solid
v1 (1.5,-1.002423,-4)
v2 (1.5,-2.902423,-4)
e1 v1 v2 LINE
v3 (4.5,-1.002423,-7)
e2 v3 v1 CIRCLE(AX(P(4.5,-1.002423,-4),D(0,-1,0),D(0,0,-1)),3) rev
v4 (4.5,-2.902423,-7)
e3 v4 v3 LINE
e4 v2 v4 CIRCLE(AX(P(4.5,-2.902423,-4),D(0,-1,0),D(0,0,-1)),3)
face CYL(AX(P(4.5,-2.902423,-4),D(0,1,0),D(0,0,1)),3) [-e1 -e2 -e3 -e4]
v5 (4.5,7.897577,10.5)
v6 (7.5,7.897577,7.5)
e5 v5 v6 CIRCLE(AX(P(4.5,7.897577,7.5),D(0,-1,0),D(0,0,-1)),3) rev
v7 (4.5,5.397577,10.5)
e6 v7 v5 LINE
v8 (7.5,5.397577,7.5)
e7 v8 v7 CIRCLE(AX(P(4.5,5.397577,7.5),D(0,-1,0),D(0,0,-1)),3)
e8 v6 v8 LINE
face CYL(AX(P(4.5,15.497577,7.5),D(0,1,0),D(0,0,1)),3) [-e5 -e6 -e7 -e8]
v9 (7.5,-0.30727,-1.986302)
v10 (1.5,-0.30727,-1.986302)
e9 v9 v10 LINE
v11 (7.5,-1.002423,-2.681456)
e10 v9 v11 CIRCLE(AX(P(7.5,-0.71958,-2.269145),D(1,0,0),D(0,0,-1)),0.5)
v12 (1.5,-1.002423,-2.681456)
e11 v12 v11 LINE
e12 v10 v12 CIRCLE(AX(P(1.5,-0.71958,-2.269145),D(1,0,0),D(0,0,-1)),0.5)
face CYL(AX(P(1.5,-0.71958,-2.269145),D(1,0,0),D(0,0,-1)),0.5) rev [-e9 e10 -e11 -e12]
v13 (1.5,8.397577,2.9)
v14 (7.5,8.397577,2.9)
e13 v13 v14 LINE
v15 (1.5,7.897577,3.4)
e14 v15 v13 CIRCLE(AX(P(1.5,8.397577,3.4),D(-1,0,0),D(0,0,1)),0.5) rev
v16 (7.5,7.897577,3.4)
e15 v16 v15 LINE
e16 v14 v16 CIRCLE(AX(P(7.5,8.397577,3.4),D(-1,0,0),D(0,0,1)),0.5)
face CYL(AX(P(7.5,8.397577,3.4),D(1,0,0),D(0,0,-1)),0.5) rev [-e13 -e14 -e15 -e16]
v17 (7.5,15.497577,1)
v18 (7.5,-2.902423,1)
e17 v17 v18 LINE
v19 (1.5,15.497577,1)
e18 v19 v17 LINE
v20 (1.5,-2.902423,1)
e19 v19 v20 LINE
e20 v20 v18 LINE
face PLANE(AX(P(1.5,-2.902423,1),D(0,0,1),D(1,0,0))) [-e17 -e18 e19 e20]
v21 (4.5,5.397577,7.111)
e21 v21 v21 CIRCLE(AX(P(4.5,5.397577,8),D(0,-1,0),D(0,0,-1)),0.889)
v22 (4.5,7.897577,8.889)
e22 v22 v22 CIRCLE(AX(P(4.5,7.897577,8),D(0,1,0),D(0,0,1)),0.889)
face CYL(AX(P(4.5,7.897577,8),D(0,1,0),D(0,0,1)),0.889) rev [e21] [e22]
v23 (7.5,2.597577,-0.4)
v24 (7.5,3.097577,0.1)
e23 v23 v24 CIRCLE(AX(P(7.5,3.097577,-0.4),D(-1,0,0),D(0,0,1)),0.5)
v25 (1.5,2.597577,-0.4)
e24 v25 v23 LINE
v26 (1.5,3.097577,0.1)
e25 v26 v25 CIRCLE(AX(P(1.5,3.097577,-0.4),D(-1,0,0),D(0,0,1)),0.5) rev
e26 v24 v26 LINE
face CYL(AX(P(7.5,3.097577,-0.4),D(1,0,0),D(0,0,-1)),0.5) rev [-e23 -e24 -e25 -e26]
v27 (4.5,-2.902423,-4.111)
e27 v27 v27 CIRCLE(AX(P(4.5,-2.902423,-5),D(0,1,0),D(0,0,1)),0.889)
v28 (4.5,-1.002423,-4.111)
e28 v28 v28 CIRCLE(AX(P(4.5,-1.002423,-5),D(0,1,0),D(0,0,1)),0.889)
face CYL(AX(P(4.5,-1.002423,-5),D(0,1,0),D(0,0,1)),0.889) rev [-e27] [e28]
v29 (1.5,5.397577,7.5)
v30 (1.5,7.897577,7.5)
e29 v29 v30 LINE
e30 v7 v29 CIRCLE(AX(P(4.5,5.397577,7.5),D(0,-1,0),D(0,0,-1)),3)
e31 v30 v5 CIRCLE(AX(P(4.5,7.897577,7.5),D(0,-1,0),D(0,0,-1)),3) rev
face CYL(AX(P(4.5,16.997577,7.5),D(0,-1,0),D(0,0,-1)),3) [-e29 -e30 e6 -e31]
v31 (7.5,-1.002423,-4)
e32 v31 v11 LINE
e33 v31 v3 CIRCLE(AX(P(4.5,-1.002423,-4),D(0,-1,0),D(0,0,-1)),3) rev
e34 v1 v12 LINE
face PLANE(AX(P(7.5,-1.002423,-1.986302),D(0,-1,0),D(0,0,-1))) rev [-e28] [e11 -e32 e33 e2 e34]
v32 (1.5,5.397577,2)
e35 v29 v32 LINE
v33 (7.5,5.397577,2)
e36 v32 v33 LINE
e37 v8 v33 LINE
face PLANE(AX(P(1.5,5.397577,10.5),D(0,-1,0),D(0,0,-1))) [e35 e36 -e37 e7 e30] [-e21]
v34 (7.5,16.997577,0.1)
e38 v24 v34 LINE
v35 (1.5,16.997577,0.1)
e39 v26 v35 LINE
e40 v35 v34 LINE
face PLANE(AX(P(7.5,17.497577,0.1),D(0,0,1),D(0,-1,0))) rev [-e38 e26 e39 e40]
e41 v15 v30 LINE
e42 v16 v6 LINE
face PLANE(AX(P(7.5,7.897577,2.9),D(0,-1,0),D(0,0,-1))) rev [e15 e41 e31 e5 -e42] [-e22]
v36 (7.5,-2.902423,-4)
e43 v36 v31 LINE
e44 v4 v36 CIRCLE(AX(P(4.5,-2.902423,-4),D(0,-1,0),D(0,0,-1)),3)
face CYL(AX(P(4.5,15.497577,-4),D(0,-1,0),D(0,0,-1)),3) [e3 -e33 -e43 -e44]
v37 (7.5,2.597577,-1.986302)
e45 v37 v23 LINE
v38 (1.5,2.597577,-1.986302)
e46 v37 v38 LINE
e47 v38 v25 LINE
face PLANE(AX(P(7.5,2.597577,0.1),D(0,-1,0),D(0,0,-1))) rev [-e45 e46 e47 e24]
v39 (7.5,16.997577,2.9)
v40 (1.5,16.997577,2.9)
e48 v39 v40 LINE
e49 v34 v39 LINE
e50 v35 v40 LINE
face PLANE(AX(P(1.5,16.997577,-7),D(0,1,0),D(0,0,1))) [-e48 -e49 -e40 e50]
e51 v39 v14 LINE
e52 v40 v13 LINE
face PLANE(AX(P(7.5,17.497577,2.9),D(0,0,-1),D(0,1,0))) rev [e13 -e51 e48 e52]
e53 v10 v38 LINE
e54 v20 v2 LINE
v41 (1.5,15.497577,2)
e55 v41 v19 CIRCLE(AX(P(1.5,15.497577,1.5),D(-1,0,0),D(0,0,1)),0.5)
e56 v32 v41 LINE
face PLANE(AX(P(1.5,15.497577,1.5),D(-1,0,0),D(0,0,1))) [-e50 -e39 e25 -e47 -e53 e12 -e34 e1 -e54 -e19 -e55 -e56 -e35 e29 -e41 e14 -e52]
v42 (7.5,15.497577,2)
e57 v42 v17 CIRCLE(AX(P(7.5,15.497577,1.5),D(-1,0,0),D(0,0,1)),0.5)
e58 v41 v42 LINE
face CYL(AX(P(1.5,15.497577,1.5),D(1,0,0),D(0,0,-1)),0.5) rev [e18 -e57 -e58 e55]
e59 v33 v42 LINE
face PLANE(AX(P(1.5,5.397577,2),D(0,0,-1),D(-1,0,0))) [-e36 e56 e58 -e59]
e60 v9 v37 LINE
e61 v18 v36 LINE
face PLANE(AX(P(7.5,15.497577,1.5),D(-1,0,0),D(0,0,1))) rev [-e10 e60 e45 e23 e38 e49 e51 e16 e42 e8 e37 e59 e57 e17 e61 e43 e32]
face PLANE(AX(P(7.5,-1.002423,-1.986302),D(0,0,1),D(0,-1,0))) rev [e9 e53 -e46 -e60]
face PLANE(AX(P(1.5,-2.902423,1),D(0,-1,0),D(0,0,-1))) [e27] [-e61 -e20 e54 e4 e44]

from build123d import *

# Parameters (mm, degrees)
BOSS_EXTRUDE1_DEPTH   = 6
SKETCH3_W             = 7.6
SKETCH3_H             = 7.1
SKETCH3_H_2           = 14.9
CUT_EXTRUDE2_DEPTH    = 21.860671783
SKETCH4_W             = 7.6
SKETCH4_H             = 2.5
SKETCH4_W_2           = 5.5
SKETCH4_H_2           = 3.6
CUT_EXTRUDE3_DEPTH    = 21.860671783
FILLET2_R             = 3
F_2_56_TAPPED_HOLE1_D = 1.778
FILLET3_R             = 0.5
F_2_56_TAPPED_HOLE2_D = 1.778
SKETCH19_R            = 0.5
CUT_EXTRUDE6_DEPTH    = 21.860671783


with BuildPart() as part:
    # Sketch1 → Boss-Extrude1 (new body)
    with BuildSketch(Plane(origin=(7.5, 0, 0), x_dir=(0, 0, -1), z_dir=(1, 0, 0))):
        with BuildLine():
            Line((-10.5, 16.997577099), (-10.5, 5.397577099))
            Line((-10.5, 5.397577099), (-2, 5.397577099))
            Line((-2, 5.397577099), (-2, 15.497577099))
            ThreePointArc((-2, 15.497577099), (-1.5, 15.997577099), (-1, 15.497577099))
            Line((-1, 15.497577099), (-1, -2.902422901))
            Line((-1, -2.902422901), (7, -2.902422901))
            Line((7, -2.902422901), (7, 16.997577099))
            Line((7, 16.997577099), (-10.5, 16.997577099))
        make_face()
    extrude(amount=-BOSS_EXTRUDE1_DEPTH)

    # Sketch3 → Cut-Extrude2 (cut, through all)
    with BuildSketch(Plane.ZY.offset(-1.5)):
        with Locations((6.7, 13.947577099)):
            Rectangle(SKETCH3_W, SKETCH3_H)
        with Locations((-3.7, 10.047577099)):
            Rectangle(SKETCH3_W, SKETCH3_H_2)
    extrude(amount=-CUT_EXTRUDE2_DEPTH, mode=Mode.SUBTRACT)

    # Sketch4 → Cut-Extrude3 (cut, through all)
    with BuildSketch(Plane.ZY.offset(-1.5)):
        with Locations((6.7, 9.147577099)):
            Rectangle(SKETCH4_W, SKETCH4_H)
        with Locations((-4.736302331, 0.797577099)):
            Rectangle(SKETCH4_W_2, SKETCH4_H_2)
    extrude(amount=-CUT_EXTRUDE3_DEPTH, mode=Mode.SUBTRACT)

    # Fillet2
    fillet2_edges = [part.edges().sort_by_distance(p)[0] for p in [
        (1.5, 6.647577099, 10.5),
        (7.5, 6.647577099, 10.5),
        (7.5, -1.952422901, -7),
        (1.5, -1.952422901, -7),
    ]]
    fillet(fillet2_edges, radius=FILLET2_R - 0.0001)  # a hair under: the kernel refuses the full size

    # #2-56 Tapped Hole1 (through all)
    with Locations(Plane(origin=(0, 7.897577099, 0), x_dir=(1, 0, 0), z_dir=(0, 1, 0))):
        with Locations((4.5, -8)):
            Hole(F_2_56_TAPPED_HOLE1_D / 2)

    # Fillet3
    fillet3_edges = [part.edges().sort_by_distance(p)[0] for p in [
        (4.5, 2.597577099, 0.1),
        (4.5, 7.897577099, 2.9),
    ]]
    fillet(fillet3_edges, radius=FILLET3_R)

    # #2-56 Tapped Hole2 (through all)
    with Locations(Plane(origin=(0, -1.002422901, 0), x_dir=(1, 0, 0), z_dir=(0, 1, 0))):
        with Locations((4.5, 5)):
            Hole(F_2_56_TAPPED_HOLE2_D / 2)

    # Sketch19 → Cut-Extrude6 (cut, through all)
    with BuildSketch(Plane(origin=(7.5, 0, 0), x_dir=(0, 0, -1), z_dir=(1, 0, 0))):
        with Locations((2.269145043, -0.719580189)):
            Circle(SKETCH19_R)
    extrude(amount=-CUT_EXTRUDE6_DEPTH, mode=Mode.SUBTRACT)


solid = part.part
